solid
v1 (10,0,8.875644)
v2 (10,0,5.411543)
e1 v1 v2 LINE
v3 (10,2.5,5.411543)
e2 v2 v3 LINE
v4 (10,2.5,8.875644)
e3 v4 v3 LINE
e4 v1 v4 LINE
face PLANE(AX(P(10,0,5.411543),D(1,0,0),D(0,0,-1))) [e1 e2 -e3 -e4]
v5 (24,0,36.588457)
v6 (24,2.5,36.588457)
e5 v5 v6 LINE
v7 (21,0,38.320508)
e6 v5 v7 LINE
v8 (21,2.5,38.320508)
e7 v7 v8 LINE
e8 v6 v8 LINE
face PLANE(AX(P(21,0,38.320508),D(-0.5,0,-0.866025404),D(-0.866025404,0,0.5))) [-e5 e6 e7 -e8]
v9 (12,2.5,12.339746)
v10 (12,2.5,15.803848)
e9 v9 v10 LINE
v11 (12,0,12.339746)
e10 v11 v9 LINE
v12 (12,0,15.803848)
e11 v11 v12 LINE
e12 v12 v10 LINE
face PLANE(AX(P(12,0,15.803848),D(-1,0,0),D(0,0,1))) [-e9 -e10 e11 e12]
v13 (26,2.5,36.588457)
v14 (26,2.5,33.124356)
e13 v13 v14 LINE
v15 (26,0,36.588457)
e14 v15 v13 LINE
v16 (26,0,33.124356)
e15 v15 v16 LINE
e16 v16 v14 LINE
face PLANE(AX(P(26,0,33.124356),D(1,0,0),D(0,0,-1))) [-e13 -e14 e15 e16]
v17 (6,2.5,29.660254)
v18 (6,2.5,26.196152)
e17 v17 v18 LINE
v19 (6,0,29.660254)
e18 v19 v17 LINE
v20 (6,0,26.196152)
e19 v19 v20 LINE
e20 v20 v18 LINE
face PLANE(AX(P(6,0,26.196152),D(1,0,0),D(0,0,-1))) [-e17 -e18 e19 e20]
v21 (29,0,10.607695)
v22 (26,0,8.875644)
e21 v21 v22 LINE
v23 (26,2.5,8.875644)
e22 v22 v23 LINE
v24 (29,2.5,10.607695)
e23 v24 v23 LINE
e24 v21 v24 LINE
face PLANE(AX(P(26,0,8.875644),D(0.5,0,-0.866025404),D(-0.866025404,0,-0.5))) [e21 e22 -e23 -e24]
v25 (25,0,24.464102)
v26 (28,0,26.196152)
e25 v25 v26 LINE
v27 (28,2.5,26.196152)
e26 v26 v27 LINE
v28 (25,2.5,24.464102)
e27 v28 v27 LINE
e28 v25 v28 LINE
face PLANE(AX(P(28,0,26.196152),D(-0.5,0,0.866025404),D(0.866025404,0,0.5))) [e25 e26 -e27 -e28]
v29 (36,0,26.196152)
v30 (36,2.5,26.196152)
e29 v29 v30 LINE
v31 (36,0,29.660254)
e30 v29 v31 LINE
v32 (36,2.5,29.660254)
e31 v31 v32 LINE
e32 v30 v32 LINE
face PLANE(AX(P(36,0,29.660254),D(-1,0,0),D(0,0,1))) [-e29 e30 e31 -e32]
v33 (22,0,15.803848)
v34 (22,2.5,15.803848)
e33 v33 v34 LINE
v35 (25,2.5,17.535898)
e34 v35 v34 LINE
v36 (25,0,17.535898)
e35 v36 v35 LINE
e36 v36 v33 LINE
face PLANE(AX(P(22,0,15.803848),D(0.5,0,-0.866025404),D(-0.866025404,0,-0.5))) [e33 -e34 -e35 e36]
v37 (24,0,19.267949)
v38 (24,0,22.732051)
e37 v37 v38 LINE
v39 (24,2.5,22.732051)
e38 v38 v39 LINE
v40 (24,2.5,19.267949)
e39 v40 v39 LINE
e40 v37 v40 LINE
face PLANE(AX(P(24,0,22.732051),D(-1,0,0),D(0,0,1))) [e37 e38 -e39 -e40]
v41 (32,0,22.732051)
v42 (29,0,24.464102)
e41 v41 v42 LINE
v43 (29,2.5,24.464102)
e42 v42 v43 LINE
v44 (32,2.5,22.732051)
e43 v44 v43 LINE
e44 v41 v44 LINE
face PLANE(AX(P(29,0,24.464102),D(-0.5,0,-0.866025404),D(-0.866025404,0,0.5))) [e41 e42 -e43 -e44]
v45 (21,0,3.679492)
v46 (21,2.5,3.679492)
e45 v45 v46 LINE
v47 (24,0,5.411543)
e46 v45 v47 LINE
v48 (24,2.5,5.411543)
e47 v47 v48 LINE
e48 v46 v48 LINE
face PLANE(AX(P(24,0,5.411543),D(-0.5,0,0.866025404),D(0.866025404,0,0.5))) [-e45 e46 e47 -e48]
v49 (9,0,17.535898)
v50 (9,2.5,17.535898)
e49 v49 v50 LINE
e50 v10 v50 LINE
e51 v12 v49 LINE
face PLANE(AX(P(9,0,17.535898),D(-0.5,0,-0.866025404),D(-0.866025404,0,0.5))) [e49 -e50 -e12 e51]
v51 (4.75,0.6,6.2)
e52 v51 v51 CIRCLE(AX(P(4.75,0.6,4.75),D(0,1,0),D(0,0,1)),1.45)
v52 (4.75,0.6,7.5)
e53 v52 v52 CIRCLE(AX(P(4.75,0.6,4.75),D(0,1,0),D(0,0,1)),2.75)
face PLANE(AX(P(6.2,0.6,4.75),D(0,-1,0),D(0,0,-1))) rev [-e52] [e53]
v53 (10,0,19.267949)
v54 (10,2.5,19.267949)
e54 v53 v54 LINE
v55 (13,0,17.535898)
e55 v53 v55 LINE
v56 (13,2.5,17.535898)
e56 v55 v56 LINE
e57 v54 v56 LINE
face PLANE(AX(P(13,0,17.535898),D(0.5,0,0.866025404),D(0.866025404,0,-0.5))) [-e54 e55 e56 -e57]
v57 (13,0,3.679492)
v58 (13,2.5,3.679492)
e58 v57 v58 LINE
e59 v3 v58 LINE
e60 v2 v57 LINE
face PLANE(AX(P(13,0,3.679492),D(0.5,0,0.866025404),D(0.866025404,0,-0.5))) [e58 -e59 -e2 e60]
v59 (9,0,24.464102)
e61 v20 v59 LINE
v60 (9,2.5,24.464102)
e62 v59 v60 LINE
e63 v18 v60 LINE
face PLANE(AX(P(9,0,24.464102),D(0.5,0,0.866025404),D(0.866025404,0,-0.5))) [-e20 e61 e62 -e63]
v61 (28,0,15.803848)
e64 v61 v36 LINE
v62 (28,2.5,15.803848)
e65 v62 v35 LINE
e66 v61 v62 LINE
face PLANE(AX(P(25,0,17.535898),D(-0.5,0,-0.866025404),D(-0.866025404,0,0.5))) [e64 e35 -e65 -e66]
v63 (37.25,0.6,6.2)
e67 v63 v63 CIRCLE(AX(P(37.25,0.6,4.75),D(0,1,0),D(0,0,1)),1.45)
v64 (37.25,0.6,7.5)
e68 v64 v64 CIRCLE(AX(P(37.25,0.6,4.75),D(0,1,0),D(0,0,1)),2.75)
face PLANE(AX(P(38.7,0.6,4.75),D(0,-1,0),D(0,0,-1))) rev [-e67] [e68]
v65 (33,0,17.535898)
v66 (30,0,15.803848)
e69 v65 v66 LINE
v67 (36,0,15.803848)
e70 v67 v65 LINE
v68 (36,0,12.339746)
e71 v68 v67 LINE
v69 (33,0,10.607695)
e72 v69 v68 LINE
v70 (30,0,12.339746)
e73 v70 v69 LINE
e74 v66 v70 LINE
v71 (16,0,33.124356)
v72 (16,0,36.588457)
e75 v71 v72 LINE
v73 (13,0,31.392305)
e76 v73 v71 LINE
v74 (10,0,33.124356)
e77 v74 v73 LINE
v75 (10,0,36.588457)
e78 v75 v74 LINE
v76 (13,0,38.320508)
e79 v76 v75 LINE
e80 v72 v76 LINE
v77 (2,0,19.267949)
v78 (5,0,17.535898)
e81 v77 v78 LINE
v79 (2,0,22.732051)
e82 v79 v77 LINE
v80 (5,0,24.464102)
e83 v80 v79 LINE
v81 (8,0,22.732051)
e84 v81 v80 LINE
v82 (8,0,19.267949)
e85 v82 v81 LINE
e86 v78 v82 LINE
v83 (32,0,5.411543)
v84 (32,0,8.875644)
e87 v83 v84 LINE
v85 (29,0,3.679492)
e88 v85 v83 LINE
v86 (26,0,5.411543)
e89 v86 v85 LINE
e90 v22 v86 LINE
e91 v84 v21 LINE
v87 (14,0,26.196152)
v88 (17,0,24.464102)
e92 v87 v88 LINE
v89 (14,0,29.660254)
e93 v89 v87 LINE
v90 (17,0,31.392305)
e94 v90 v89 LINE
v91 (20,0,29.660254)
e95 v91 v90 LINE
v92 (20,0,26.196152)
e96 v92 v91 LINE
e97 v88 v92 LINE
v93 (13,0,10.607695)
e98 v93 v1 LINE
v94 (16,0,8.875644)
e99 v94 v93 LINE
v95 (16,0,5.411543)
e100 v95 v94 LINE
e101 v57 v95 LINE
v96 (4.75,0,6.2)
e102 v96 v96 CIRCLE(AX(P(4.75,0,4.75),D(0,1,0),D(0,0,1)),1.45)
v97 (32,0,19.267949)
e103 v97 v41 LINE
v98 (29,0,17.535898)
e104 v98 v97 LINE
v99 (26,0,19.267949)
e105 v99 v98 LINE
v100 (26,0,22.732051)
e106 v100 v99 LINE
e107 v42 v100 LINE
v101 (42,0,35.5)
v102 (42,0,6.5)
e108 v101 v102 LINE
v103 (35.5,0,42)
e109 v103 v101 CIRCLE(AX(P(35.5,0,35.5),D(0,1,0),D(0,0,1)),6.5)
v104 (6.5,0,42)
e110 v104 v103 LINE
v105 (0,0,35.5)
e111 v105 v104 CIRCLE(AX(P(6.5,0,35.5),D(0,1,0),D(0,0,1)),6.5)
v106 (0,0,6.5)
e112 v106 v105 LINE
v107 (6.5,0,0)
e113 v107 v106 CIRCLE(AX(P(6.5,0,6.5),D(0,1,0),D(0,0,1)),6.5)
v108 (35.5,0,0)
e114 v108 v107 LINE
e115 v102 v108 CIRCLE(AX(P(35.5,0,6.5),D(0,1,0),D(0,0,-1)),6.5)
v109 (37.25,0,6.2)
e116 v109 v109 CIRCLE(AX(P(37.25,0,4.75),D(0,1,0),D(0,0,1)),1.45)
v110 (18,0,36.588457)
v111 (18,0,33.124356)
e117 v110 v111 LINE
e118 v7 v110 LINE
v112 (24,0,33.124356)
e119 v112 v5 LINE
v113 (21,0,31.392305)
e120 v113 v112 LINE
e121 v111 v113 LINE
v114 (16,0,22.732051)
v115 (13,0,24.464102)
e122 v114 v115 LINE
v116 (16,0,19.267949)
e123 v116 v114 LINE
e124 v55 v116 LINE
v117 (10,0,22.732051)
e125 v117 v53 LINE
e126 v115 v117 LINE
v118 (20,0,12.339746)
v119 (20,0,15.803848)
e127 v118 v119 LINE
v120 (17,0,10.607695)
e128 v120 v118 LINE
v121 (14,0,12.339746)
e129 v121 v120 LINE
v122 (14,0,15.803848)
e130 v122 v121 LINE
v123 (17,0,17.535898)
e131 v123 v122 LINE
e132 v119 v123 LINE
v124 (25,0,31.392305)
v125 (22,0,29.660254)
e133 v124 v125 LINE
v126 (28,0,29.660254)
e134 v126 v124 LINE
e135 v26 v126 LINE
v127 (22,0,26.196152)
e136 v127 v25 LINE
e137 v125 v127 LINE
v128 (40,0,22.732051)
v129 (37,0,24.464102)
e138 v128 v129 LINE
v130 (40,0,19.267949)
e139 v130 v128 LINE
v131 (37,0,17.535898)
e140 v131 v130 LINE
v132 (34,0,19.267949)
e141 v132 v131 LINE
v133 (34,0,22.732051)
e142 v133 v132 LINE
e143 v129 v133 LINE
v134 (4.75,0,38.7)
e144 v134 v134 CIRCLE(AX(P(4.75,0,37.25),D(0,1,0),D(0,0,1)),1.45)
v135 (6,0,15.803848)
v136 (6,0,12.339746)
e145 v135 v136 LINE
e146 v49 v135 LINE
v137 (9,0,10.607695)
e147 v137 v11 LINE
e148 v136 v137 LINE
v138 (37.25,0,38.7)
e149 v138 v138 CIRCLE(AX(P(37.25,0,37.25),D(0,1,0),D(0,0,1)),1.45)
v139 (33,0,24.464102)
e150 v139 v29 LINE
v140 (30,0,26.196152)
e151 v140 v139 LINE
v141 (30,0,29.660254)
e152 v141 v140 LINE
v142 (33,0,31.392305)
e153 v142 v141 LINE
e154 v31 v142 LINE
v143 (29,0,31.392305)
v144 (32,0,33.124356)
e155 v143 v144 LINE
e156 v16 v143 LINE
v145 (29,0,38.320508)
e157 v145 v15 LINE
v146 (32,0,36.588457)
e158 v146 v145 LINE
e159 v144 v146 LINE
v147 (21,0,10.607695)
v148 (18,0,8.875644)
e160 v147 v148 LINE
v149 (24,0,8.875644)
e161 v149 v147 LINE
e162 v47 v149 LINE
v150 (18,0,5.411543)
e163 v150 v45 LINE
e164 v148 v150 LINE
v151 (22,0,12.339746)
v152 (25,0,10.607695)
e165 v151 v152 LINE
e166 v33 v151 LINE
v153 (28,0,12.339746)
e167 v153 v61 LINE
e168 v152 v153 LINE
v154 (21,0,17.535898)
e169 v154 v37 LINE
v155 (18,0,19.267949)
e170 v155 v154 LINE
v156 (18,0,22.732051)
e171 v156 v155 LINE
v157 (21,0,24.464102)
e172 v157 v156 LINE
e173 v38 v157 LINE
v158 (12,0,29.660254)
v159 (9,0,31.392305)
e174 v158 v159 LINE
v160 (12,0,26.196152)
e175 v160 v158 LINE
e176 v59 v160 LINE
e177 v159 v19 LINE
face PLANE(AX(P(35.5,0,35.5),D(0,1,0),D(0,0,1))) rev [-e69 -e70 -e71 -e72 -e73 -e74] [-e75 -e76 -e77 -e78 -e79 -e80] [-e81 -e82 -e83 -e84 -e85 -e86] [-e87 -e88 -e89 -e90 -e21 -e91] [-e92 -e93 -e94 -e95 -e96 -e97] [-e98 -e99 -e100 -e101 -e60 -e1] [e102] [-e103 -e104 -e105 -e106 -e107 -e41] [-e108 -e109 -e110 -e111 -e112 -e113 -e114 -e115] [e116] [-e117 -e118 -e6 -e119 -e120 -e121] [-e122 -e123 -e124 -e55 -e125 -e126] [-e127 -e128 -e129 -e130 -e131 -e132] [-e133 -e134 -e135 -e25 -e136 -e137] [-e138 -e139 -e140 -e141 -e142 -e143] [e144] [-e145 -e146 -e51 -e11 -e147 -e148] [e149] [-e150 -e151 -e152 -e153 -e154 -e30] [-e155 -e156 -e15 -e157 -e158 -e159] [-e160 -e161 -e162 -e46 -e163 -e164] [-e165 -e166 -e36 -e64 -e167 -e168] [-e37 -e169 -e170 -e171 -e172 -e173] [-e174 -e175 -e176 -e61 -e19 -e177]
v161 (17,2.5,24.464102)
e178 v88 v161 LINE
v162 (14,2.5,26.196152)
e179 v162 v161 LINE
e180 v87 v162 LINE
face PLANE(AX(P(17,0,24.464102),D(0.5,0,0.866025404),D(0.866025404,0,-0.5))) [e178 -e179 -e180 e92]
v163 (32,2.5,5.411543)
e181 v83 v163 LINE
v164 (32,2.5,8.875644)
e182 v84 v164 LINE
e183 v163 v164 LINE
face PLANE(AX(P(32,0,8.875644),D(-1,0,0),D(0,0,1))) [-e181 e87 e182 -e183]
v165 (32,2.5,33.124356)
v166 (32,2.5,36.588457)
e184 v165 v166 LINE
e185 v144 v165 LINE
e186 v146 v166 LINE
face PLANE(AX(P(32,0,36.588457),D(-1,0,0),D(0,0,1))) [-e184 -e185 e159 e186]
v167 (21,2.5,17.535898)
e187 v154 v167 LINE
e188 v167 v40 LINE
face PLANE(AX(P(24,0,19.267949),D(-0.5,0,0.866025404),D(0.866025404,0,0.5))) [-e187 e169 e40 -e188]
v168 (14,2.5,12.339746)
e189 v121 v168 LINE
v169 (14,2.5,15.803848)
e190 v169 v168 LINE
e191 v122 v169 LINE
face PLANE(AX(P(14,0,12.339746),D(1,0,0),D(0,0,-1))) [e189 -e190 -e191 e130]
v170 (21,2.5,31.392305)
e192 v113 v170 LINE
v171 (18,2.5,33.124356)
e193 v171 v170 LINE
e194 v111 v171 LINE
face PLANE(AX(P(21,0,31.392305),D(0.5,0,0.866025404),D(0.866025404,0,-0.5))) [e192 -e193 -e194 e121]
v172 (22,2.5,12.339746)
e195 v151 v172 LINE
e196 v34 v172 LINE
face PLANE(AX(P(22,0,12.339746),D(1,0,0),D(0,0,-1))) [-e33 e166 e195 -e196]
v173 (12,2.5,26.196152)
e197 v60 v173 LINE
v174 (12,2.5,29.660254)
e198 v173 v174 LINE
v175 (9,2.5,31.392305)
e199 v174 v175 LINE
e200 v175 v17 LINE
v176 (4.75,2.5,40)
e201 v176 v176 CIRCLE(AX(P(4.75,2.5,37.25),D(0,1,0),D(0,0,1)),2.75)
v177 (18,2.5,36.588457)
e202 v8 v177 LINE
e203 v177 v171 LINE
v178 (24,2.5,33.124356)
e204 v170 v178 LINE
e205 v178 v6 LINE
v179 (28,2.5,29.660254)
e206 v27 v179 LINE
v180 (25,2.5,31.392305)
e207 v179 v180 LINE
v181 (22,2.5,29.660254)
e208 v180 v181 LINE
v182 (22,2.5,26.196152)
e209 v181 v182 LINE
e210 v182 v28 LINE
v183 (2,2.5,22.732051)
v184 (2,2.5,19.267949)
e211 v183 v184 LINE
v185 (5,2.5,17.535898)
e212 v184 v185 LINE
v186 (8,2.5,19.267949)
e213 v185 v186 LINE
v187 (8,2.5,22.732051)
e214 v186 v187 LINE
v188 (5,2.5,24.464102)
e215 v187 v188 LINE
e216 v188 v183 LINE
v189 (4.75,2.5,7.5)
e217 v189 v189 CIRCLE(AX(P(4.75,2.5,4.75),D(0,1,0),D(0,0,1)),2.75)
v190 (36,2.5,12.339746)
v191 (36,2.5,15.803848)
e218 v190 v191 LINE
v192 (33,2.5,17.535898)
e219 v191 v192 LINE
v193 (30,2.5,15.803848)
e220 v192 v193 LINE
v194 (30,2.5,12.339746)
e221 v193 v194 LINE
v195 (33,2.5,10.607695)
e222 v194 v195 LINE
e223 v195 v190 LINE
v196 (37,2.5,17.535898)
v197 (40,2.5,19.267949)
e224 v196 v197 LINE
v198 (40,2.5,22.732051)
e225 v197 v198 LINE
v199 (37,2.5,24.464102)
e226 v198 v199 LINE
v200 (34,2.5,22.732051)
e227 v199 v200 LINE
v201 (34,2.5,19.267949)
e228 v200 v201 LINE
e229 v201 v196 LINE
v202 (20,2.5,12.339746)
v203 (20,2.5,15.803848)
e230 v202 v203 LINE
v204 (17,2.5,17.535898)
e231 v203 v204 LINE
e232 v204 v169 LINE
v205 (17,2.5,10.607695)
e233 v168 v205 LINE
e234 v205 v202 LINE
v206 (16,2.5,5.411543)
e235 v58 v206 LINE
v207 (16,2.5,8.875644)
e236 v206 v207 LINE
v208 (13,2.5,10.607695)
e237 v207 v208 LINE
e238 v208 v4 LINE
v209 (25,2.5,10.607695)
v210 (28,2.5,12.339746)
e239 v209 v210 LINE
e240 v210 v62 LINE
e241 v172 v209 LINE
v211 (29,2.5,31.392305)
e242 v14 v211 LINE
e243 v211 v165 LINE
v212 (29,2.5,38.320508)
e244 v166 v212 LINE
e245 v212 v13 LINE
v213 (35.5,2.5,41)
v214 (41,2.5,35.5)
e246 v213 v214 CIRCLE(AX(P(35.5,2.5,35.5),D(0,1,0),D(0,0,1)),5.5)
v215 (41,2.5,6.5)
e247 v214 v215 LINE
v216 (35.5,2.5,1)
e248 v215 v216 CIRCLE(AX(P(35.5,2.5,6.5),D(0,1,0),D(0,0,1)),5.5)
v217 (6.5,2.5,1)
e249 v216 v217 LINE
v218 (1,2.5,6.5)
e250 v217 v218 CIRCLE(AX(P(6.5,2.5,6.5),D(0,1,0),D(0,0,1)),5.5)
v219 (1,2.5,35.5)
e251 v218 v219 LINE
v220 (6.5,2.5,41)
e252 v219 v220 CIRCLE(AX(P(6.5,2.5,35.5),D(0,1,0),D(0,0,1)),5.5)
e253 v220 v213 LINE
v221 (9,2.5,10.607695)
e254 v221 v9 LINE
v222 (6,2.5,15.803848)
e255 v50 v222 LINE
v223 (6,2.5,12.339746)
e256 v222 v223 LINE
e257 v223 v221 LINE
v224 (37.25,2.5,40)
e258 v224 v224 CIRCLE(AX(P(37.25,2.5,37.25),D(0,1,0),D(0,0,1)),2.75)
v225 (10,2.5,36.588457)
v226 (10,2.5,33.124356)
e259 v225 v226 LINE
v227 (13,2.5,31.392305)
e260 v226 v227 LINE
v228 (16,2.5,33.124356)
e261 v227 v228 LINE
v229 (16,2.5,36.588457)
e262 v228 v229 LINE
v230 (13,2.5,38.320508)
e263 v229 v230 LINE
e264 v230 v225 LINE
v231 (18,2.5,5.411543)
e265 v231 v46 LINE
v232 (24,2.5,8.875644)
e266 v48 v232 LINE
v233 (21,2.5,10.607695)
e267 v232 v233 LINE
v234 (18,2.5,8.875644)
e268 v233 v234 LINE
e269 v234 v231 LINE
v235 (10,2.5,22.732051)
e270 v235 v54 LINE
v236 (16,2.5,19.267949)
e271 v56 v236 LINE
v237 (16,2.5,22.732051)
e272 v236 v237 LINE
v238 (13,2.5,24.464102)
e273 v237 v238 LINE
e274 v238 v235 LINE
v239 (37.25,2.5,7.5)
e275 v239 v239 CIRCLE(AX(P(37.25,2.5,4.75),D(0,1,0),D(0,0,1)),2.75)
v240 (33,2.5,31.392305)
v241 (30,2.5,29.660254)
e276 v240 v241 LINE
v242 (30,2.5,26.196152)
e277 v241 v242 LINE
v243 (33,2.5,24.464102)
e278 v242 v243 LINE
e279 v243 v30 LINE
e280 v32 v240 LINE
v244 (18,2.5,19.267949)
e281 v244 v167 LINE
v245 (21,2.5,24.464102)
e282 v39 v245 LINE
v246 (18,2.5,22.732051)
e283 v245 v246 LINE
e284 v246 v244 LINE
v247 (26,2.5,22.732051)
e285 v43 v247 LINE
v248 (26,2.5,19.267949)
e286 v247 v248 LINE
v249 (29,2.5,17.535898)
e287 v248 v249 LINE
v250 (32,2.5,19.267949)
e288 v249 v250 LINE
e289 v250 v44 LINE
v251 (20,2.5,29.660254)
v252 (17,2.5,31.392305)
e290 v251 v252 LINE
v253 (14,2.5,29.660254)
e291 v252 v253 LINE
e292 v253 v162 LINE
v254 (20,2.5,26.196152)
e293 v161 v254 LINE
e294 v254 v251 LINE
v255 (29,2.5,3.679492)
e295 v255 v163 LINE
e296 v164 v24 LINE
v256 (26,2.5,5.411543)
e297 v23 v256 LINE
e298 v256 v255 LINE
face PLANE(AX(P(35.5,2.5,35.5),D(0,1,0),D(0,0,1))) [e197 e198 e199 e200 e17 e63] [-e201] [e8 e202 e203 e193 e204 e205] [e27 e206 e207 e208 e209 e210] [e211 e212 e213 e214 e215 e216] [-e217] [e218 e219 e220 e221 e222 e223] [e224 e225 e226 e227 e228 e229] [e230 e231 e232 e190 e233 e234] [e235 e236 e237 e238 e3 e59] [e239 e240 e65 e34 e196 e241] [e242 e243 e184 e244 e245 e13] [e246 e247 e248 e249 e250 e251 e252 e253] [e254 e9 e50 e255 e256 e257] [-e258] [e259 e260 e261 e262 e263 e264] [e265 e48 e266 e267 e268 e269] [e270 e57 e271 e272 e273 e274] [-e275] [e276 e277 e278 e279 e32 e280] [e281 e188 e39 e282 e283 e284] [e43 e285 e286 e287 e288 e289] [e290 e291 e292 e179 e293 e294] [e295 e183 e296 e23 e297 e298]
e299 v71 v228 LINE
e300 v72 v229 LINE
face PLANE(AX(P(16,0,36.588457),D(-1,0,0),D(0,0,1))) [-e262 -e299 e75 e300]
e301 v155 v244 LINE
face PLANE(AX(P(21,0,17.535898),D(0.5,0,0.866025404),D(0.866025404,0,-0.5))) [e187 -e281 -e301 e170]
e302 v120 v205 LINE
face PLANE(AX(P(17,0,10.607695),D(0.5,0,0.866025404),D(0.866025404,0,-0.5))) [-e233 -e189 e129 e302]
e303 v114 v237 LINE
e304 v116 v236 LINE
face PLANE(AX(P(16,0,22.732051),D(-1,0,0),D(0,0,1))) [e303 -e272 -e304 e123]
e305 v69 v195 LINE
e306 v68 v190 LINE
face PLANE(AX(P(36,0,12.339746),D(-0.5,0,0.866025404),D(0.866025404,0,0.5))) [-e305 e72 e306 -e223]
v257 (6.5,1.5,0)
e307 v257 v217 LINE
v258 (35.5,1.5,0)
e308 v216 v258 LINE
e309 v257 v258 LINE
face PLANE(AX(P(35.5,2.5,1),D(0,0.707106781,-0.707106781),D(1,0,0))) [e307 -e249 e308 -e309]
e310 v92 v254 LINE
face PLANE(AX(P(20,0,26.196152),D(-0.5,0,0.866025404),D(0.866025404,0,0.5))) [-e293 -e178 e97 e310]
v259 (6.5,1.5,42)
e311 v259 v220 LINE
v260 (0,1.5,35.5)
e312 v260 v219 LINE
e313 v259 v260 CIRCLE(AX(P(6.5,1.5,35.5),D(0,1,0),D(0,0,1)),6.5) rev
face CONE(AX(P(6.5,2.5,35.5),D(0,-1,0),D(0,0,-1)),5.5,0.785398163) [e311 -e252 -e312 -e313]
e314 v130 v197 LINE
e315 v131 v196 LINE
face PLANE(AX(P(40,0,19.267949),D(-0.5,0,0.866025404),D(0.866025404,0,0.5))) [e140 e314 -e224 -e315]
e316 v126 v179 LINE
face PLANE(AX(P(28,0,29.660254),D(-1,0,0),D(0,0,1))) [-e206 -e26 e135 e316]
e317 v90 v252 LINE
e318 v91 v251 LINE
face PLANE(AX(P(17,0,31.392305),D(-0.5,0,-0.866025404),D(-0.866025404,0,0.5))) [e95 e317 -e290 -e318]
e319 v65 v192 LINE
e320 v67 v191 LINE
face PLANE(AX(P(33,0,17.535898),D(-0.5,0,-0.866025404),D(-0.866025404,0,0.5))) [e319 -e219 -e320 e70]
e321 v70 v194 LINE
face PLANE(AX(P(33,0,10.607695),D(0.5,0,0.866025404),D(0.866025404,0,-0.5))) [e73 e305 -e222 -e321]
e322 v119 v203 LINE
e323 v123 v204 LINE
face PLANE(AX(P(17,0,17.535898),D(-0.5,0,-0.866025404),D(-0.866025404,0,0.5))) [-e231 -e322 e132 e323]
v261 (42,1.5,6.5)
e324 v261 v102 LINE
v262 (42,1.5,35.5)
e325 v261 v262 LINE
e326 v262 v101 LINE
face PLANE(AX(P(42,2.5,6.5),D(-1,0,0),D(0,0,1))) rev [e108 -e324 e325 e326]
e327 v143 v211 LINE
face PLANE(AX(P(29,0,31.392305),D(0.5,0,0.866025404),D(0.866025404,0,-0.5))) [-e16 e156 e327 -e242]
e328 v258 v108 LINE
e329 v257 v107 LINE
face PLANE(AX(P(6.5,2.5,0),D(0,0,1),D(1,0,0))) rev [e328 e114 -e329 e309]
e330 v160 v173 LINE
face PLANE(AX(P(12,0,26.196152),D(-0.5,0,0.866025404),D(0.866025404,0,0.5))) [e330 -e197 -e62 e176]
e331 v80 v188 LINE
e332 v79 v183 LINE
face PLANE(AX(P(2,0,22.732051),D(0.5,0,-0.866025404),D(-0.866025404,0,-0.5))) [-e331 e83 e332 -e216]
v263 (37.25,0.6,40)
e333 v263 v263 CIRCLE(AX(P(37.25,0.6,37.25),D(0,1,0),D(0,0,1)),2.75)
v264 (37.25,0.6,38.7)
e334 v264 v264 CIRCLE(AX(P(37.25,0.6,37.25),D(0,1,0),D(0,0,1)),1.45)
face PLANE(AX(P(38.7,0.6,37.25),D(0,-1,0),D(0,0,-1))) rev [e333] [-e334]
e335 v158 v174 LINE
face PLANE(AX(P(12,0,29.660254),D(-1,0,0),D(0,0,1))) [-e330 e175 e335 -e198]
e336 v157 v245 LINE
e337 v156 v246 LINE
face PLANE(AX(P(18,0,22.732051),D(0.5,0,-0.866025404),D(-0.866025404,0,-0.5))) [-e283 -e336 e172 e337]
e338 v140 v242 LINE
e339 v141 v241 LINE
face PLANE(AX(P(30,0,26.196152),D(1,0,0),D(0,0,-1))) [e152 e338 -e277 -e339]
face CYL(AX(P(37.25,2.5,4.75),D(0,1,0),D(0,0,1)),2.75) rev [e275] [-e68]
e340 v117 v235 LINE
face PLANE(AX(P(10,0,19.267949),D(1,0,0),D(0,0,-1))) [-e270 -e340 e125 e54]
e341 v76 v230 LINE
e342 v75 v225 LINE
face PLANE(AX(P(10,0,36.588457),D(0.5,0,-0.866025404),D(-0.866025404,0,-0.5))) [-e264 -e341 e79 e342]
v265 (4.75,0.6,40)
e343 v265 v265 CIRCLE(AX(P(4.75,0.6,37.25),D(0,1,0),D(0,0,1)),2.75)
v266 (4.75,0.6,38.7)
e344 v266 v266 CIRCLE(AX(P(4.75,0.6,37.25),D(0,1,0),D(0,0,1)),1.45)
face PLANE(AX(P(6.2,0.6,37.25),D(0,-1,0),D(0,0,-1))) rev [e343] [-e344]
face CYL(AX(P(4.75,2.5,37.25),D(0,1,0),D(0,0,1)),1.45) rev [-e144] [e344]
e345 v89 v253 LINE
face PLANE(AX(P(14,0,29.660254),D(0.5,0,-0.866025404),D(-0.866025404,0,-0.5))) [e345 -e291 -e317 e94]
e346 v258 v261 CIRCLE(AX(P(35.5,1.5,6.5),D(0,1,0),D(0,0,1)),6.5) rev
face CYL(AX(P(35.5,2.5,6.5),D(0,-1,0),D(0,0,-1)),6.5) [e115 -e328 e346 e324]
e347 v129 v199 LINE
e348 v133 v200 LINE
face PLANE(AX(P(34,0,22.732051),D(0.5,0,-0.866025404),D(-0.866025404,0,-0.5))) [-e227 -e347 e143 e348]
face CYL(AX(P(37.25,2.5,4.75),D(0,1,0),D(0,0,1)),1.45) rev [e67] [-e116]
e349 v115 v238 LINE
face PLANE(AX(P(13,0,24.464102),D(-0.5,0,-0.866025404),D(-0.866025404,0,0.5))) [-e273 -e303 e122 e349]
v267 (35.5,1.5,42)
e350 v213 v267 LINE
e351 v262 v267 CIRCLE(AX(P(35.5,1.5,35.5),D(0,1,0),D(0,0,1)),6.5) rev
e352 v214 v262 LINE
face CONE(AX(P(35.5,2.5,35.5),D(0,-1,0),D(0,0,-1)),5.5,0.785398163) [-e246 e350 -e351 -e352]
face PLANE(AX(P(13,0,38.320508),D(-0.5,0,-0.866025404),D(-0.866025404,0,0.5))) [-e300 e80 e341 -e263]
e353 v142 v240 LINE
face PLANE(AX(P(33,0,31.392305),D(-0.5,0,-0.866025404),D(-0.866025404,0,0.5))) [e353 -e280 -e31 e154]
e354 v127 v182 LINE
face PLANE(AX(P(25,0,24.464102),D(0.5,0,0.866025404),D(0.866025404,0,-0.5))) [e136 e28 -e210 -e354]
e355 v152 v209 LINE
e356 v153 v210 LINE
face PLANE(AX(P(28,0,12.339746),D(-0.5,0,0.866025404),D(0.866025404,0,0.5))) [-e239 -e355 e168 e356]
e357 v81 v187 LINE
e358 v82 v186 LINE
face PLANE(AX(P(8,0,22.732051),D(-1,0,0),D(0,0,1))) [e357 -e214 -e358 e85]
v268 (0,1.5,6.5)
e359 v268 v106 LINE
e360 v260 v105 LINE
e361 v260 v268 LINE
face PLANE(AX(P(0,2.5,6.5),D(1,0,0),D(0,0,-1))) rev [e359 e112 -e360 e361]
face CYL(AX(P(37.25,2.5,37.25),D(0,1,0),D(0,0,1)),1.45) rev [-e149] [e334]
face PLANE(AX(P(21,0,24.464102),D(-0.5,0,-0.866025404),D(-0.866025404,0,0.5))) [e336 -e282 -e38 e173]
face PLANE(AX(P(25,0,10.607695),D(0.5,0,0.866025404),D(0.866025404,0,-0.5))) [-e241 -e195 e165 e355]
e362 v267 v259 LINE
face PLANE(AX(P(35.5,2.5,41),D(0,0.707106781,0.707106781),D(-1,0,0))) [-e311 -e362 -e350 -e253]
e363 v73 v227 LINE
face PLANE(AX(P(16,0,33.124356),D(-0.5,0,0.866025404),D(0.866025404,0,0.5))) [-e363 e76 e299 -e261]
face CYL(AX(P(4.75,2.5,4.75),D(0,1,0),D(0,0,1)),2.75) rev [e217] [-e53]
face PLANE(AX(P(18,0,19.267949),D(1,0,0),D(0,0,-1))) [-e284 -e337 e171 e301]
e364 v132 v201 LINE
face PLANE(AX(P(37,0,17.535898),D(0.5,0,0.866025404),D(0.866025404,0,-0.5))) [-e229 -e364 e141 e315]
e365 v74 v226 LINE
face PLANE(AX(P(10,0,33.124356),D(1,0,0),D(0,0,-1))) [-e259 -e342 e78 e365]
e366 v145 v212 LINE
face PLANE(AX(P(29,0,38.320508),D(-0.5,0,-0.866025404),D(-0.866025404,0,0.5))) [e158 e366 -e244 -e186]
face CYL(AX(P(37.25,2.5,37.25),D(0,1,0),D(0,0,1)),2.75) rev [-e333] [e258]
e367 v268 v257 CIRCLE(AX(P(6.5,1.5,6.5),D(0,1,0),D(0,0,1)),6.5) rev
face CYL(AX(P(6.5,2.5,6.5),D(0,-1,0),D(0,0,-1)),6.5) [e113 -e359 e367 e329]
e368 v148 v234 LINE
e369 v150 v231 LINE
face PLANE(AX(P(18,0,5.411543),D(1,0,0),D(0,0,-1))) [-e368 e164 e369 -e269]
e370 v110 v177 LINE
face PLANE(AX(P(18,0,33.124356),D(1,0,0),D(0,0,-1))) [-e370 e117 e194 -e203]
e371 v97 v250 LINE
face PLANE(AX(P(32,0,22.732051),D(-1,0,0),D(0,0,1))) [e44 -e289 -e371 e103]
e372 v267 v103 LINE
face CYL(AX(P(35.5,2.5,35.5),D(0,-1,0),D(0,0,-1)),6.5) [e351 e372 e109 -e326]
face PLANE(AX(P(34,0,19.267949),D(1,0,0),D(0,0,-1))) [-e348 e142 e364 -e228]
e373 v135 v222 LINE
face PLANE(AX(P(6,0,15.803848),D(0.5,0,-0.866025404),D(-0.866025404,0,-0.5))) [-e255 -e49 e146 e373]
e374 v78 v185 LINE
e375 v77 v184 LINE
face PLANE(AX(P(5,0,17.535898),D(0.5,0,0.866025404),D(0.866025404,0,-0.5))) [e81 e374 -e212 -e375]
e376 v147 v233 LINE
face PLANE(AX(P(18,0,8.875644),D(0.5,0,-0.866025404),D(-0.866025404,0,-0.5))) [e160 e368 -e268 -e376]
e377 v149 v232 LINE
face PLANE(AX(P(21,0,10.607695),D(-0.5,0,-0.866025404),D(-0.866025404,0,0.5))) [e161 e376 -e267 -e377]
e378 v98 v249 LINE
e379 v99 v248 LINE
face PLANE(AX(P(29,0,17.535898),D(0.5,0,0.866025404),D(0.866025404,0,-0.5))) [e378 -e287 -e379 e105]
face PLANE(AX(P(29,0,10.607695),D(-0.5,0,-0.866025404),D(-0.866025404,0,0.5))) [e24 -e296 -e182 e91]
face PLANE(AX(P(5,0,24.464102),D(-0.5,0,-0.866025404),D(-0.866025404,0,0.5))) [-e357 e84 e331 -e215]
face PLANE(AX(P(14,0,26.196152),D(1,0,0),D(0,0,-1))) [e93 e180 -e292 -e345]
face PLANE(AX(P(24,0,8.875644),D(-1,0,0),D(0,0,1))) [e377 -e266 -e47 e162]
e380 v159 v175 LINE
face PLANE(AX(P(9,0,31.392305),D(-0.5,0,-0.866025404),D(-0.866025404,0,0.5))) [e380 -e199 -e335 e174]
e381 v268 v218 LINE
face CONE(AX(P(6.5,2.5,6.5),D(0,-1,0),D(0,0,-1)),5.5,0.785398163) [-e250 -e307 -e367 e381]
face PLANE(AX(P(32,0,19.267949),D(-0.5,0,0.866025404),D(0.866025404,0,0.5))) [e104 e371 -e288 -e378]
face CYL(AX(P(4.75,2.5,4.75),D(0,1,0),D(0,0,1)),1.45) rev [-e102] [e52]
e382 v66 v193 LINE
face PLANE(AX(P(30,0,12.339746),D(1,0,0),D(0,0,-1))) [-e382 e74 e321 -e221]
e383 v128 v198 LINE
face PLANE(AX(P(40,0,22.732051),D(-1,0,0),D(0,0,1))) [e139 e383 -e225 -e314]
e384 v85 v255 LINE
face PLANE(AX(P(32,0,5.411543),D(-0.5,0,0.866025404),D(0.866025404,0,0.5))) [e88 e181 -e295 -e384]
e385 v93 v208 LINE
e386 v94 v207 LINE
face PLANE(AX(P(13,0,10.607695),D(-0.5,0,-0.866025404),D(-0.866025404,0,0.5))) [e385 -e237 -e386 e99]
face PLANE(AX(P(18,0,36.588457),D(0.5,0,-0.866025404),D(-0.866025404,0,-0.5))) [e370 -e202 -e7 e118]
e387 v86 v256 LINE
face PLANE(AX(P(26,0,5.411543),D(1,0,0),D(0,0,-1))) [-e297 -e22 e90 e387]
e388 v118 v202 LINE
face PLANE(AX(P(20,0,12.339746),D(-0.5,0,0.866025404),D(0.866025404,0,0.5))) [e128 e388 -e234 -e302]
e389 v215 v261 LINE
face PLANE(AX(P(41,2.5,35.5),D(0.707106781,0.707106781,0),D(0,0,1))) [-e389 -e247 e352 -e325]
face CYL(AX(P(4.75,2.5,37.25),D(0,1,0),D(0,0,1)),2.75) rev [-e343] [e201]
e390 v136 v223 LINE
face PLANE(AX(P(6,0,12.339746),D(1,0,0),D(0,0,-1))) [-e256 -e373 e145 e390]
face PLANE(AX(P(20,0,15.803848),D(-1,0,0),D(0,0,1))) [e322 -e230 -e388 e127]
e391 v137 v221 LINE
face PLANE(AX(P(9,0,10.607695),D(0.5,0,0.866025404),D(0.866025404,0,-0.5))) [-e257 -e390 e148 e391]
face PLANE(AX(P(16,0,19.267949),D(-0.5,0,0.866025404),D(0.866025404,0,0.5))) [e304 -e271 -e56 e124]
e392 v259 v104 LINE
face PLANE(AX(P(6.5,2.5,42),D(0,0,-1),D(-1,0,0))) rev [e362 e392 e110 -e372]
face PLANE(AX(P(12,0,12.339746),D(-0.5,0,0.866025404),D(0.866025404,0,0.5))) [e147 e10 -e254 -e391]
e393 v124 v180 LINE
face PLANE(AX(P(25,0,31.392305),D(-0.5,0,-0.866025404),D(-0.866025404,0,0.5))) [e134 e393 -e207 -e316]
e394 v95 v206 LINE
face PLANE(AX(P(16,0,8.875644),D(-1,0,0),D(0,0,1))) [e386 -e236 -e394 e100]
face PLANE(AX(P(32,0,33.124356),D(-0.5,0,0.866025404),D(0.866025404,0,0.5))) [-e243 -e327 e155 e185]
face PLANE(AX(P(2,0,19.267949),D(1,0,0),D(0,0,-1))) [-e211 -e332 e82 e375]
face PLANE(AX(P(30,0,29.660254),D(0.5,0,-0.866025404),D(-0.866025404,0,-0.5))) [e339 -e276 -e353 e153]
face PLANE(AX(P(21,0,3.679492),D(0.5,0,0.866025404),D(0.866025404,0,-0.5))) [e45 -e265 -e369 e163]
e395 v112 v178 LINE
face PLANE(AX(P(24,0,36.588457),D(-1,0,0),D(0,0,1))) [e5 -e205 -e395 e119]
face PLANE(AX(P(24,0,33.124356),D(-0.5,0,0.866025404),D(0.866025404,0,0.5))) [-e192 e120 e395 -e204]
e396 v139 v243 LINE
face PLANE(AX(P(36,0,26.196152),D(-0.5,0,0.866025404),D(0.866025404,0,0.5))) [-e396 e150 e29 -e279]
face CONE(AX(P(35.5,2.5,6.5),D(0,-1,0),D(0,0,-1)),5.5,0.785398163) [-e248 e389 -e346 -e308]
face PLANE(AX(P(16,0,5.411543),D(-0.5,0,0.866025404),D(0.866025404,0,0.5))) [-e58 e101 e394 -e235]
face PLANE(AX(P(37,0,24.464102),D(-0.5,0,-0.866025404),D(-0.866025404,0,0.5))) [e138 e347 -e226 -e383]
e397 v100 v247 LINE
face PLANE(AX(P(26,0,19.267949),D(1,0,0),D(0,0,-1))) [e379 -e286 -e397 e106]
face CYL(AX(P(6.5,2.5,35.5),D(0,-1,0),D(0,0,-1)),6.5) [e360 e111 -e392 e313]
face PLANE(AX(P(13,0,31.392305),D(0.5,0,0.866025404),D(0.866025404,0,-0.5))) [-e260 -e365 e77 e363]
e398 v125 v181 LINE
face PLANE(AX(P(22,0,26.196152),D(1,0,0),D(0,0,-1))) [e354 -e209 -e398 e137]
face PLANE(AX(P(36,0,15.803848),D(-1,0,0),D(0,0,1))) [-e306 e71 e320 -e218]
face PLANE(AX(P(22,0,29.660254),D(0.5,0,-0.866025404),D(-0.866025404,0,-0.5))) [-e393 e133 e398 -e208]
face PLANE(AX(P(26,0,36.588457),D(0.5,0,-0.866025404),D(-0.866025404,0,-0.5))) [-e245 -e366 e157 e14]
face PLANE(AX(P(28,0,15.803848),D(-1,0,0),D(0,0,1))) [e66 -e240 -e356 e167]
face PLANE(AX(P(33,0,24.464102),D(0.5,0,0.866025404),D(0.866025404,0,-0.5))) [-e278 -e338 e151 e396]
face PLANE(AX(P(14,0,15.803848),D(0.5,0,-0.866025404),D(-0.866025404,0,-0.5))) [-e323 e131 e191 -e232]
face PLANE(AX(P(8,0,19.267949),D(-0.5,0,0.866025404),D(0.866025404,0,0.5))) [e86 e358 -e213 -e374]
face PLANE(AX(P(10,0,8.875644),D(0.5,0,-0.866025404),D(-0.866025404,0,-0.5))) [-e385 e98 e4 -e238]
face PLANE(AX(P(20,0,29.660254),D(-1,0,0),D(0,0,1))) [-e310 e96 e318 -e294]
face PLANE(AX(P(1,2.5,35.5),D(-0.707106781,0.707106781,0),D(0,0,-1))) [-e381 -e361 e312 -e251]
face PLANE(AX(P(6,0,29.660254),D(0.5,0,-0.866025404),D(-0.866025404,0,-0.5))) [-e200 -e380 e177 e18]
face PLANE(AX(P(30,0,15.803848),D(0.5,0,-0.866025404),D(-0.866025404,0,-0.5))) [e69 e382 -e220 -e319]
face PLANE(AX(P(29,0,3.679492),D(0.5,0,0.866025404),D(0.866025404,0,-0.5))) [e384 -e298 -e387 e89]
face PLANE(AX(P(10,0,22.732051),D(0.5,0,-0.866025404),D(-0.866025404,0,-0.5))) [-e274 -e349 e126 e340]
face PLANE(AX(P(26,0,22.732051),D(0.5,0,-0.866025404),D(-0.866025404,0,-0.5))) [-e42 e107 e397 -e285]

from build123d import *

# Parameters (mm, degrees)
BOSS_EXTRUDE1_DEPTH                                  = 2.5
CBORE_FOR_M2_5_HEX_SOCKET_HEAD_CAP_SCREW_D           = 2.9
CBORE_FOR_M2_5_HEX_SOCKET_HEAD_CAP_SCREW_CBORE_D     = 5.5
CBORE_FOR_M2_5_HEX_SOCKET_HEAD_CAP_SCREW_CBORE_DEPTH = 1.9
FILL_PATTERN2_DEPTH                                  = 2.5
CHAMFER1_SIZE                                        = 1


# Read off the part's stored shape, not the designer's step: Fill Pattern2
with BuildPart() as part:
    # Sketch1 → Boss-Extrude1 (new body)
    with BuildSketch(Plane(origin=(0, 0, 0), x_dir=(1, 0, 0), z_dir=(0, 1, 0))):
        with BuildLine():
            Line((6.5, 0), (35.5, 0))
            ThreePointArc((35.5, 0), (40.096194078, -1.903805922), (42, -6.5))
            Line((42, -6.5), (42, -35.5))
            ThreePointArc((42, -35.5), (40.096194078, -40.096194078), (35.5, -42))
            Line((35.5, -42), (6.5, -42))
            ThreePointArc((6.5, -42), (1.903805922, -40.096194078), (0, -35.5))
            Line((0, -35.5), (0, -6.5))
            ThreePointArc((0, -6.5), (1.903805922, -1.903805922), (6.5, 0))
        make_face()
    extrude(amount=BOSS_EXTRUDE1_DEPTH)

    # CBORE for M2.5 Hex Socket Head Cap Screw1 (through all)
    with Locations(Plane(origin=(0, 2.5, 0), x_dir=(1, 0, 0), z_dir=(0, 1, 0))):
        with Locations((4.75, -37.25), (4.75, -4.75), (37.25, -4.75), (37.25, -37.25)):
            CounterBoreHole(CBORE_FOR_M2_5_HEX_SOCKET_HEAD_CAP_SCREW_D / 2, CBORE_FOR_M2_5_HEX_SOCKET_HEAD_CAP_SCREW_CBORE_D / 2, CBORE_FOR_M2_5_HEX_SOCKET_HEAD_CAP_SCREW_CBORE_DEPTH)

    # Fill Pattern2 outline → Fill Pattern2 (cut)
    with BuildSketch(Plane(origin=(0, 0, 0), x_dir=(1, 0, 0), z_dir=(0, 1, 0))):
        Polygon((8, -19.267949192), (5, -17.535898385), (2, -19.267949192), (2, -22.732050808), (5, -24.464101615), (8, -22.732050808), align=None)
        Polygon((20, -26.196152423), (17, -24.464101615), (14, -26.196152423), (14, -29.660254038), (17, -31.392304845), (20, -29.660254038), align=None)
        Polygon((32, -33.124355653), (29, -31.392304845), (26, -33.124355653), (26, -36.588457268), (29, -38.320508076), (32, -36.588457268), align=None)
        Polygon((29, -3.679491924), (26, -5.411542732), (26, -8.875644347), (29, -10.607695155), (32, -8.875644347), (32, -5.411542732), align=None)
        Polygon((17, -10.607695155), (14, -12.339745962), (14, -15.803847577), (17, -17.535898385), (20, -15.803847577), (20, -12.339745962), align=None)
        Polygon((36, -12.339745962), (33, -10.607695155), (30, -12.339745962), (30, -15.803847577), (33, -17.535898385), (36, -15.803847577), align=None)
        Polygon((24, -5.411542732), (21, -3.679491924), (18, -5.411542732), (18, -8.875644347), (21, -10.607695155), (24, -8.875644347), align=None)
        Polygon((9, -24.464101615), (6, -26.196152423), (6, -29.660254038), (9, -31.392304845), (12, -29.660254038), (12, -26.196152423), align=None)
        Polygon((21, -17.535898385), (18, -19.267949192), (18, -22.732050808), (21, -24.464101615), (24, -22.732050808), (24, -19.267949192), align=None)
        Polygon((30, -26.196152423), (30, -29.660254038), (33, -31.392304845), (36, -29.660254038), (36, -26.196152423), (33, -24.464101615), align=None)
        Polygon((26, -19.267949192), (26, -22.732050808), (29, -24.464101615), (32, -22.732050808), (32, -19.267949192), (29, -17.535898385), align=None)
        Polygon((16, -19.267949192), (13, -17.535898385), (10, -19.267949192), (10, -22.732050808), (13, -24.464101615), (16, -22.732050808), align=None)
        Polygon((28, -26.196152423), (25, -24.464101615), (22, -26.196152423), (22, -29.660254038), (25, -31.392304845), (28, -29.660254038), align=None)
        Polygon((25, -10.607695155), (22, -12.339745962), (22, -15.803847577), (25, -17.535898385), (28, -15.803847577), (28, -12.339745962), align=None)
        Polygon((10, -33.124355653), (10, -36.588457268), (13, -38.320508076), (16, -36.588457268), (16, -33.124355653), (13, -31.392304845), align=None)
        Polygon((10, -5.411542732), (10, -8.875644347), (13, -10.607695155), (16, -8.875644347), (16, -5.411542732), (13, -3.679491924), align=None)
        Polygon((12, -12.339745962), (9, -10.607695155), (6, -12.339745962), (6, -15.803847577), (9, -17.535898385), (12, -15.803847577), align=None)
        Polygon((37, -17.535898385), (34, -19.267949192), (34, -22.732050808), (37, -24.464101615), (40, -22.732050808), (40, -19.267949192), align=None)
        Polygon((24, -33.124355653), (21, -31.392304845), (18, -33.124355653), (18, -36.588457268), (21, -38.320508076), (24, -36.588457268), align=None)
    extrude(amount=FILL_PATTERN2_DEPTH, mode=Mode.SUBTRACT)

    # Chamfer1
    chamfer1_edges = [part.edges().sort_by_distance(p)[0] for p in [
        (40.096194078, 2.5, 1.903805922),
        (21, 2.5, 0),
        (1.903805922, 2.5, 1.903805922),
        (0, 2.5, 21),
        (1.903805922, 2.5, 40.096194078),
        (21, 2.5, 42),
        (40.096194078, 2.5, 40.096194078),
        (42, 2.5, 21),
    ]]
    chamfer(chamfer1_edges, length=CHAMFER1_SIZE)


solid = part.part
